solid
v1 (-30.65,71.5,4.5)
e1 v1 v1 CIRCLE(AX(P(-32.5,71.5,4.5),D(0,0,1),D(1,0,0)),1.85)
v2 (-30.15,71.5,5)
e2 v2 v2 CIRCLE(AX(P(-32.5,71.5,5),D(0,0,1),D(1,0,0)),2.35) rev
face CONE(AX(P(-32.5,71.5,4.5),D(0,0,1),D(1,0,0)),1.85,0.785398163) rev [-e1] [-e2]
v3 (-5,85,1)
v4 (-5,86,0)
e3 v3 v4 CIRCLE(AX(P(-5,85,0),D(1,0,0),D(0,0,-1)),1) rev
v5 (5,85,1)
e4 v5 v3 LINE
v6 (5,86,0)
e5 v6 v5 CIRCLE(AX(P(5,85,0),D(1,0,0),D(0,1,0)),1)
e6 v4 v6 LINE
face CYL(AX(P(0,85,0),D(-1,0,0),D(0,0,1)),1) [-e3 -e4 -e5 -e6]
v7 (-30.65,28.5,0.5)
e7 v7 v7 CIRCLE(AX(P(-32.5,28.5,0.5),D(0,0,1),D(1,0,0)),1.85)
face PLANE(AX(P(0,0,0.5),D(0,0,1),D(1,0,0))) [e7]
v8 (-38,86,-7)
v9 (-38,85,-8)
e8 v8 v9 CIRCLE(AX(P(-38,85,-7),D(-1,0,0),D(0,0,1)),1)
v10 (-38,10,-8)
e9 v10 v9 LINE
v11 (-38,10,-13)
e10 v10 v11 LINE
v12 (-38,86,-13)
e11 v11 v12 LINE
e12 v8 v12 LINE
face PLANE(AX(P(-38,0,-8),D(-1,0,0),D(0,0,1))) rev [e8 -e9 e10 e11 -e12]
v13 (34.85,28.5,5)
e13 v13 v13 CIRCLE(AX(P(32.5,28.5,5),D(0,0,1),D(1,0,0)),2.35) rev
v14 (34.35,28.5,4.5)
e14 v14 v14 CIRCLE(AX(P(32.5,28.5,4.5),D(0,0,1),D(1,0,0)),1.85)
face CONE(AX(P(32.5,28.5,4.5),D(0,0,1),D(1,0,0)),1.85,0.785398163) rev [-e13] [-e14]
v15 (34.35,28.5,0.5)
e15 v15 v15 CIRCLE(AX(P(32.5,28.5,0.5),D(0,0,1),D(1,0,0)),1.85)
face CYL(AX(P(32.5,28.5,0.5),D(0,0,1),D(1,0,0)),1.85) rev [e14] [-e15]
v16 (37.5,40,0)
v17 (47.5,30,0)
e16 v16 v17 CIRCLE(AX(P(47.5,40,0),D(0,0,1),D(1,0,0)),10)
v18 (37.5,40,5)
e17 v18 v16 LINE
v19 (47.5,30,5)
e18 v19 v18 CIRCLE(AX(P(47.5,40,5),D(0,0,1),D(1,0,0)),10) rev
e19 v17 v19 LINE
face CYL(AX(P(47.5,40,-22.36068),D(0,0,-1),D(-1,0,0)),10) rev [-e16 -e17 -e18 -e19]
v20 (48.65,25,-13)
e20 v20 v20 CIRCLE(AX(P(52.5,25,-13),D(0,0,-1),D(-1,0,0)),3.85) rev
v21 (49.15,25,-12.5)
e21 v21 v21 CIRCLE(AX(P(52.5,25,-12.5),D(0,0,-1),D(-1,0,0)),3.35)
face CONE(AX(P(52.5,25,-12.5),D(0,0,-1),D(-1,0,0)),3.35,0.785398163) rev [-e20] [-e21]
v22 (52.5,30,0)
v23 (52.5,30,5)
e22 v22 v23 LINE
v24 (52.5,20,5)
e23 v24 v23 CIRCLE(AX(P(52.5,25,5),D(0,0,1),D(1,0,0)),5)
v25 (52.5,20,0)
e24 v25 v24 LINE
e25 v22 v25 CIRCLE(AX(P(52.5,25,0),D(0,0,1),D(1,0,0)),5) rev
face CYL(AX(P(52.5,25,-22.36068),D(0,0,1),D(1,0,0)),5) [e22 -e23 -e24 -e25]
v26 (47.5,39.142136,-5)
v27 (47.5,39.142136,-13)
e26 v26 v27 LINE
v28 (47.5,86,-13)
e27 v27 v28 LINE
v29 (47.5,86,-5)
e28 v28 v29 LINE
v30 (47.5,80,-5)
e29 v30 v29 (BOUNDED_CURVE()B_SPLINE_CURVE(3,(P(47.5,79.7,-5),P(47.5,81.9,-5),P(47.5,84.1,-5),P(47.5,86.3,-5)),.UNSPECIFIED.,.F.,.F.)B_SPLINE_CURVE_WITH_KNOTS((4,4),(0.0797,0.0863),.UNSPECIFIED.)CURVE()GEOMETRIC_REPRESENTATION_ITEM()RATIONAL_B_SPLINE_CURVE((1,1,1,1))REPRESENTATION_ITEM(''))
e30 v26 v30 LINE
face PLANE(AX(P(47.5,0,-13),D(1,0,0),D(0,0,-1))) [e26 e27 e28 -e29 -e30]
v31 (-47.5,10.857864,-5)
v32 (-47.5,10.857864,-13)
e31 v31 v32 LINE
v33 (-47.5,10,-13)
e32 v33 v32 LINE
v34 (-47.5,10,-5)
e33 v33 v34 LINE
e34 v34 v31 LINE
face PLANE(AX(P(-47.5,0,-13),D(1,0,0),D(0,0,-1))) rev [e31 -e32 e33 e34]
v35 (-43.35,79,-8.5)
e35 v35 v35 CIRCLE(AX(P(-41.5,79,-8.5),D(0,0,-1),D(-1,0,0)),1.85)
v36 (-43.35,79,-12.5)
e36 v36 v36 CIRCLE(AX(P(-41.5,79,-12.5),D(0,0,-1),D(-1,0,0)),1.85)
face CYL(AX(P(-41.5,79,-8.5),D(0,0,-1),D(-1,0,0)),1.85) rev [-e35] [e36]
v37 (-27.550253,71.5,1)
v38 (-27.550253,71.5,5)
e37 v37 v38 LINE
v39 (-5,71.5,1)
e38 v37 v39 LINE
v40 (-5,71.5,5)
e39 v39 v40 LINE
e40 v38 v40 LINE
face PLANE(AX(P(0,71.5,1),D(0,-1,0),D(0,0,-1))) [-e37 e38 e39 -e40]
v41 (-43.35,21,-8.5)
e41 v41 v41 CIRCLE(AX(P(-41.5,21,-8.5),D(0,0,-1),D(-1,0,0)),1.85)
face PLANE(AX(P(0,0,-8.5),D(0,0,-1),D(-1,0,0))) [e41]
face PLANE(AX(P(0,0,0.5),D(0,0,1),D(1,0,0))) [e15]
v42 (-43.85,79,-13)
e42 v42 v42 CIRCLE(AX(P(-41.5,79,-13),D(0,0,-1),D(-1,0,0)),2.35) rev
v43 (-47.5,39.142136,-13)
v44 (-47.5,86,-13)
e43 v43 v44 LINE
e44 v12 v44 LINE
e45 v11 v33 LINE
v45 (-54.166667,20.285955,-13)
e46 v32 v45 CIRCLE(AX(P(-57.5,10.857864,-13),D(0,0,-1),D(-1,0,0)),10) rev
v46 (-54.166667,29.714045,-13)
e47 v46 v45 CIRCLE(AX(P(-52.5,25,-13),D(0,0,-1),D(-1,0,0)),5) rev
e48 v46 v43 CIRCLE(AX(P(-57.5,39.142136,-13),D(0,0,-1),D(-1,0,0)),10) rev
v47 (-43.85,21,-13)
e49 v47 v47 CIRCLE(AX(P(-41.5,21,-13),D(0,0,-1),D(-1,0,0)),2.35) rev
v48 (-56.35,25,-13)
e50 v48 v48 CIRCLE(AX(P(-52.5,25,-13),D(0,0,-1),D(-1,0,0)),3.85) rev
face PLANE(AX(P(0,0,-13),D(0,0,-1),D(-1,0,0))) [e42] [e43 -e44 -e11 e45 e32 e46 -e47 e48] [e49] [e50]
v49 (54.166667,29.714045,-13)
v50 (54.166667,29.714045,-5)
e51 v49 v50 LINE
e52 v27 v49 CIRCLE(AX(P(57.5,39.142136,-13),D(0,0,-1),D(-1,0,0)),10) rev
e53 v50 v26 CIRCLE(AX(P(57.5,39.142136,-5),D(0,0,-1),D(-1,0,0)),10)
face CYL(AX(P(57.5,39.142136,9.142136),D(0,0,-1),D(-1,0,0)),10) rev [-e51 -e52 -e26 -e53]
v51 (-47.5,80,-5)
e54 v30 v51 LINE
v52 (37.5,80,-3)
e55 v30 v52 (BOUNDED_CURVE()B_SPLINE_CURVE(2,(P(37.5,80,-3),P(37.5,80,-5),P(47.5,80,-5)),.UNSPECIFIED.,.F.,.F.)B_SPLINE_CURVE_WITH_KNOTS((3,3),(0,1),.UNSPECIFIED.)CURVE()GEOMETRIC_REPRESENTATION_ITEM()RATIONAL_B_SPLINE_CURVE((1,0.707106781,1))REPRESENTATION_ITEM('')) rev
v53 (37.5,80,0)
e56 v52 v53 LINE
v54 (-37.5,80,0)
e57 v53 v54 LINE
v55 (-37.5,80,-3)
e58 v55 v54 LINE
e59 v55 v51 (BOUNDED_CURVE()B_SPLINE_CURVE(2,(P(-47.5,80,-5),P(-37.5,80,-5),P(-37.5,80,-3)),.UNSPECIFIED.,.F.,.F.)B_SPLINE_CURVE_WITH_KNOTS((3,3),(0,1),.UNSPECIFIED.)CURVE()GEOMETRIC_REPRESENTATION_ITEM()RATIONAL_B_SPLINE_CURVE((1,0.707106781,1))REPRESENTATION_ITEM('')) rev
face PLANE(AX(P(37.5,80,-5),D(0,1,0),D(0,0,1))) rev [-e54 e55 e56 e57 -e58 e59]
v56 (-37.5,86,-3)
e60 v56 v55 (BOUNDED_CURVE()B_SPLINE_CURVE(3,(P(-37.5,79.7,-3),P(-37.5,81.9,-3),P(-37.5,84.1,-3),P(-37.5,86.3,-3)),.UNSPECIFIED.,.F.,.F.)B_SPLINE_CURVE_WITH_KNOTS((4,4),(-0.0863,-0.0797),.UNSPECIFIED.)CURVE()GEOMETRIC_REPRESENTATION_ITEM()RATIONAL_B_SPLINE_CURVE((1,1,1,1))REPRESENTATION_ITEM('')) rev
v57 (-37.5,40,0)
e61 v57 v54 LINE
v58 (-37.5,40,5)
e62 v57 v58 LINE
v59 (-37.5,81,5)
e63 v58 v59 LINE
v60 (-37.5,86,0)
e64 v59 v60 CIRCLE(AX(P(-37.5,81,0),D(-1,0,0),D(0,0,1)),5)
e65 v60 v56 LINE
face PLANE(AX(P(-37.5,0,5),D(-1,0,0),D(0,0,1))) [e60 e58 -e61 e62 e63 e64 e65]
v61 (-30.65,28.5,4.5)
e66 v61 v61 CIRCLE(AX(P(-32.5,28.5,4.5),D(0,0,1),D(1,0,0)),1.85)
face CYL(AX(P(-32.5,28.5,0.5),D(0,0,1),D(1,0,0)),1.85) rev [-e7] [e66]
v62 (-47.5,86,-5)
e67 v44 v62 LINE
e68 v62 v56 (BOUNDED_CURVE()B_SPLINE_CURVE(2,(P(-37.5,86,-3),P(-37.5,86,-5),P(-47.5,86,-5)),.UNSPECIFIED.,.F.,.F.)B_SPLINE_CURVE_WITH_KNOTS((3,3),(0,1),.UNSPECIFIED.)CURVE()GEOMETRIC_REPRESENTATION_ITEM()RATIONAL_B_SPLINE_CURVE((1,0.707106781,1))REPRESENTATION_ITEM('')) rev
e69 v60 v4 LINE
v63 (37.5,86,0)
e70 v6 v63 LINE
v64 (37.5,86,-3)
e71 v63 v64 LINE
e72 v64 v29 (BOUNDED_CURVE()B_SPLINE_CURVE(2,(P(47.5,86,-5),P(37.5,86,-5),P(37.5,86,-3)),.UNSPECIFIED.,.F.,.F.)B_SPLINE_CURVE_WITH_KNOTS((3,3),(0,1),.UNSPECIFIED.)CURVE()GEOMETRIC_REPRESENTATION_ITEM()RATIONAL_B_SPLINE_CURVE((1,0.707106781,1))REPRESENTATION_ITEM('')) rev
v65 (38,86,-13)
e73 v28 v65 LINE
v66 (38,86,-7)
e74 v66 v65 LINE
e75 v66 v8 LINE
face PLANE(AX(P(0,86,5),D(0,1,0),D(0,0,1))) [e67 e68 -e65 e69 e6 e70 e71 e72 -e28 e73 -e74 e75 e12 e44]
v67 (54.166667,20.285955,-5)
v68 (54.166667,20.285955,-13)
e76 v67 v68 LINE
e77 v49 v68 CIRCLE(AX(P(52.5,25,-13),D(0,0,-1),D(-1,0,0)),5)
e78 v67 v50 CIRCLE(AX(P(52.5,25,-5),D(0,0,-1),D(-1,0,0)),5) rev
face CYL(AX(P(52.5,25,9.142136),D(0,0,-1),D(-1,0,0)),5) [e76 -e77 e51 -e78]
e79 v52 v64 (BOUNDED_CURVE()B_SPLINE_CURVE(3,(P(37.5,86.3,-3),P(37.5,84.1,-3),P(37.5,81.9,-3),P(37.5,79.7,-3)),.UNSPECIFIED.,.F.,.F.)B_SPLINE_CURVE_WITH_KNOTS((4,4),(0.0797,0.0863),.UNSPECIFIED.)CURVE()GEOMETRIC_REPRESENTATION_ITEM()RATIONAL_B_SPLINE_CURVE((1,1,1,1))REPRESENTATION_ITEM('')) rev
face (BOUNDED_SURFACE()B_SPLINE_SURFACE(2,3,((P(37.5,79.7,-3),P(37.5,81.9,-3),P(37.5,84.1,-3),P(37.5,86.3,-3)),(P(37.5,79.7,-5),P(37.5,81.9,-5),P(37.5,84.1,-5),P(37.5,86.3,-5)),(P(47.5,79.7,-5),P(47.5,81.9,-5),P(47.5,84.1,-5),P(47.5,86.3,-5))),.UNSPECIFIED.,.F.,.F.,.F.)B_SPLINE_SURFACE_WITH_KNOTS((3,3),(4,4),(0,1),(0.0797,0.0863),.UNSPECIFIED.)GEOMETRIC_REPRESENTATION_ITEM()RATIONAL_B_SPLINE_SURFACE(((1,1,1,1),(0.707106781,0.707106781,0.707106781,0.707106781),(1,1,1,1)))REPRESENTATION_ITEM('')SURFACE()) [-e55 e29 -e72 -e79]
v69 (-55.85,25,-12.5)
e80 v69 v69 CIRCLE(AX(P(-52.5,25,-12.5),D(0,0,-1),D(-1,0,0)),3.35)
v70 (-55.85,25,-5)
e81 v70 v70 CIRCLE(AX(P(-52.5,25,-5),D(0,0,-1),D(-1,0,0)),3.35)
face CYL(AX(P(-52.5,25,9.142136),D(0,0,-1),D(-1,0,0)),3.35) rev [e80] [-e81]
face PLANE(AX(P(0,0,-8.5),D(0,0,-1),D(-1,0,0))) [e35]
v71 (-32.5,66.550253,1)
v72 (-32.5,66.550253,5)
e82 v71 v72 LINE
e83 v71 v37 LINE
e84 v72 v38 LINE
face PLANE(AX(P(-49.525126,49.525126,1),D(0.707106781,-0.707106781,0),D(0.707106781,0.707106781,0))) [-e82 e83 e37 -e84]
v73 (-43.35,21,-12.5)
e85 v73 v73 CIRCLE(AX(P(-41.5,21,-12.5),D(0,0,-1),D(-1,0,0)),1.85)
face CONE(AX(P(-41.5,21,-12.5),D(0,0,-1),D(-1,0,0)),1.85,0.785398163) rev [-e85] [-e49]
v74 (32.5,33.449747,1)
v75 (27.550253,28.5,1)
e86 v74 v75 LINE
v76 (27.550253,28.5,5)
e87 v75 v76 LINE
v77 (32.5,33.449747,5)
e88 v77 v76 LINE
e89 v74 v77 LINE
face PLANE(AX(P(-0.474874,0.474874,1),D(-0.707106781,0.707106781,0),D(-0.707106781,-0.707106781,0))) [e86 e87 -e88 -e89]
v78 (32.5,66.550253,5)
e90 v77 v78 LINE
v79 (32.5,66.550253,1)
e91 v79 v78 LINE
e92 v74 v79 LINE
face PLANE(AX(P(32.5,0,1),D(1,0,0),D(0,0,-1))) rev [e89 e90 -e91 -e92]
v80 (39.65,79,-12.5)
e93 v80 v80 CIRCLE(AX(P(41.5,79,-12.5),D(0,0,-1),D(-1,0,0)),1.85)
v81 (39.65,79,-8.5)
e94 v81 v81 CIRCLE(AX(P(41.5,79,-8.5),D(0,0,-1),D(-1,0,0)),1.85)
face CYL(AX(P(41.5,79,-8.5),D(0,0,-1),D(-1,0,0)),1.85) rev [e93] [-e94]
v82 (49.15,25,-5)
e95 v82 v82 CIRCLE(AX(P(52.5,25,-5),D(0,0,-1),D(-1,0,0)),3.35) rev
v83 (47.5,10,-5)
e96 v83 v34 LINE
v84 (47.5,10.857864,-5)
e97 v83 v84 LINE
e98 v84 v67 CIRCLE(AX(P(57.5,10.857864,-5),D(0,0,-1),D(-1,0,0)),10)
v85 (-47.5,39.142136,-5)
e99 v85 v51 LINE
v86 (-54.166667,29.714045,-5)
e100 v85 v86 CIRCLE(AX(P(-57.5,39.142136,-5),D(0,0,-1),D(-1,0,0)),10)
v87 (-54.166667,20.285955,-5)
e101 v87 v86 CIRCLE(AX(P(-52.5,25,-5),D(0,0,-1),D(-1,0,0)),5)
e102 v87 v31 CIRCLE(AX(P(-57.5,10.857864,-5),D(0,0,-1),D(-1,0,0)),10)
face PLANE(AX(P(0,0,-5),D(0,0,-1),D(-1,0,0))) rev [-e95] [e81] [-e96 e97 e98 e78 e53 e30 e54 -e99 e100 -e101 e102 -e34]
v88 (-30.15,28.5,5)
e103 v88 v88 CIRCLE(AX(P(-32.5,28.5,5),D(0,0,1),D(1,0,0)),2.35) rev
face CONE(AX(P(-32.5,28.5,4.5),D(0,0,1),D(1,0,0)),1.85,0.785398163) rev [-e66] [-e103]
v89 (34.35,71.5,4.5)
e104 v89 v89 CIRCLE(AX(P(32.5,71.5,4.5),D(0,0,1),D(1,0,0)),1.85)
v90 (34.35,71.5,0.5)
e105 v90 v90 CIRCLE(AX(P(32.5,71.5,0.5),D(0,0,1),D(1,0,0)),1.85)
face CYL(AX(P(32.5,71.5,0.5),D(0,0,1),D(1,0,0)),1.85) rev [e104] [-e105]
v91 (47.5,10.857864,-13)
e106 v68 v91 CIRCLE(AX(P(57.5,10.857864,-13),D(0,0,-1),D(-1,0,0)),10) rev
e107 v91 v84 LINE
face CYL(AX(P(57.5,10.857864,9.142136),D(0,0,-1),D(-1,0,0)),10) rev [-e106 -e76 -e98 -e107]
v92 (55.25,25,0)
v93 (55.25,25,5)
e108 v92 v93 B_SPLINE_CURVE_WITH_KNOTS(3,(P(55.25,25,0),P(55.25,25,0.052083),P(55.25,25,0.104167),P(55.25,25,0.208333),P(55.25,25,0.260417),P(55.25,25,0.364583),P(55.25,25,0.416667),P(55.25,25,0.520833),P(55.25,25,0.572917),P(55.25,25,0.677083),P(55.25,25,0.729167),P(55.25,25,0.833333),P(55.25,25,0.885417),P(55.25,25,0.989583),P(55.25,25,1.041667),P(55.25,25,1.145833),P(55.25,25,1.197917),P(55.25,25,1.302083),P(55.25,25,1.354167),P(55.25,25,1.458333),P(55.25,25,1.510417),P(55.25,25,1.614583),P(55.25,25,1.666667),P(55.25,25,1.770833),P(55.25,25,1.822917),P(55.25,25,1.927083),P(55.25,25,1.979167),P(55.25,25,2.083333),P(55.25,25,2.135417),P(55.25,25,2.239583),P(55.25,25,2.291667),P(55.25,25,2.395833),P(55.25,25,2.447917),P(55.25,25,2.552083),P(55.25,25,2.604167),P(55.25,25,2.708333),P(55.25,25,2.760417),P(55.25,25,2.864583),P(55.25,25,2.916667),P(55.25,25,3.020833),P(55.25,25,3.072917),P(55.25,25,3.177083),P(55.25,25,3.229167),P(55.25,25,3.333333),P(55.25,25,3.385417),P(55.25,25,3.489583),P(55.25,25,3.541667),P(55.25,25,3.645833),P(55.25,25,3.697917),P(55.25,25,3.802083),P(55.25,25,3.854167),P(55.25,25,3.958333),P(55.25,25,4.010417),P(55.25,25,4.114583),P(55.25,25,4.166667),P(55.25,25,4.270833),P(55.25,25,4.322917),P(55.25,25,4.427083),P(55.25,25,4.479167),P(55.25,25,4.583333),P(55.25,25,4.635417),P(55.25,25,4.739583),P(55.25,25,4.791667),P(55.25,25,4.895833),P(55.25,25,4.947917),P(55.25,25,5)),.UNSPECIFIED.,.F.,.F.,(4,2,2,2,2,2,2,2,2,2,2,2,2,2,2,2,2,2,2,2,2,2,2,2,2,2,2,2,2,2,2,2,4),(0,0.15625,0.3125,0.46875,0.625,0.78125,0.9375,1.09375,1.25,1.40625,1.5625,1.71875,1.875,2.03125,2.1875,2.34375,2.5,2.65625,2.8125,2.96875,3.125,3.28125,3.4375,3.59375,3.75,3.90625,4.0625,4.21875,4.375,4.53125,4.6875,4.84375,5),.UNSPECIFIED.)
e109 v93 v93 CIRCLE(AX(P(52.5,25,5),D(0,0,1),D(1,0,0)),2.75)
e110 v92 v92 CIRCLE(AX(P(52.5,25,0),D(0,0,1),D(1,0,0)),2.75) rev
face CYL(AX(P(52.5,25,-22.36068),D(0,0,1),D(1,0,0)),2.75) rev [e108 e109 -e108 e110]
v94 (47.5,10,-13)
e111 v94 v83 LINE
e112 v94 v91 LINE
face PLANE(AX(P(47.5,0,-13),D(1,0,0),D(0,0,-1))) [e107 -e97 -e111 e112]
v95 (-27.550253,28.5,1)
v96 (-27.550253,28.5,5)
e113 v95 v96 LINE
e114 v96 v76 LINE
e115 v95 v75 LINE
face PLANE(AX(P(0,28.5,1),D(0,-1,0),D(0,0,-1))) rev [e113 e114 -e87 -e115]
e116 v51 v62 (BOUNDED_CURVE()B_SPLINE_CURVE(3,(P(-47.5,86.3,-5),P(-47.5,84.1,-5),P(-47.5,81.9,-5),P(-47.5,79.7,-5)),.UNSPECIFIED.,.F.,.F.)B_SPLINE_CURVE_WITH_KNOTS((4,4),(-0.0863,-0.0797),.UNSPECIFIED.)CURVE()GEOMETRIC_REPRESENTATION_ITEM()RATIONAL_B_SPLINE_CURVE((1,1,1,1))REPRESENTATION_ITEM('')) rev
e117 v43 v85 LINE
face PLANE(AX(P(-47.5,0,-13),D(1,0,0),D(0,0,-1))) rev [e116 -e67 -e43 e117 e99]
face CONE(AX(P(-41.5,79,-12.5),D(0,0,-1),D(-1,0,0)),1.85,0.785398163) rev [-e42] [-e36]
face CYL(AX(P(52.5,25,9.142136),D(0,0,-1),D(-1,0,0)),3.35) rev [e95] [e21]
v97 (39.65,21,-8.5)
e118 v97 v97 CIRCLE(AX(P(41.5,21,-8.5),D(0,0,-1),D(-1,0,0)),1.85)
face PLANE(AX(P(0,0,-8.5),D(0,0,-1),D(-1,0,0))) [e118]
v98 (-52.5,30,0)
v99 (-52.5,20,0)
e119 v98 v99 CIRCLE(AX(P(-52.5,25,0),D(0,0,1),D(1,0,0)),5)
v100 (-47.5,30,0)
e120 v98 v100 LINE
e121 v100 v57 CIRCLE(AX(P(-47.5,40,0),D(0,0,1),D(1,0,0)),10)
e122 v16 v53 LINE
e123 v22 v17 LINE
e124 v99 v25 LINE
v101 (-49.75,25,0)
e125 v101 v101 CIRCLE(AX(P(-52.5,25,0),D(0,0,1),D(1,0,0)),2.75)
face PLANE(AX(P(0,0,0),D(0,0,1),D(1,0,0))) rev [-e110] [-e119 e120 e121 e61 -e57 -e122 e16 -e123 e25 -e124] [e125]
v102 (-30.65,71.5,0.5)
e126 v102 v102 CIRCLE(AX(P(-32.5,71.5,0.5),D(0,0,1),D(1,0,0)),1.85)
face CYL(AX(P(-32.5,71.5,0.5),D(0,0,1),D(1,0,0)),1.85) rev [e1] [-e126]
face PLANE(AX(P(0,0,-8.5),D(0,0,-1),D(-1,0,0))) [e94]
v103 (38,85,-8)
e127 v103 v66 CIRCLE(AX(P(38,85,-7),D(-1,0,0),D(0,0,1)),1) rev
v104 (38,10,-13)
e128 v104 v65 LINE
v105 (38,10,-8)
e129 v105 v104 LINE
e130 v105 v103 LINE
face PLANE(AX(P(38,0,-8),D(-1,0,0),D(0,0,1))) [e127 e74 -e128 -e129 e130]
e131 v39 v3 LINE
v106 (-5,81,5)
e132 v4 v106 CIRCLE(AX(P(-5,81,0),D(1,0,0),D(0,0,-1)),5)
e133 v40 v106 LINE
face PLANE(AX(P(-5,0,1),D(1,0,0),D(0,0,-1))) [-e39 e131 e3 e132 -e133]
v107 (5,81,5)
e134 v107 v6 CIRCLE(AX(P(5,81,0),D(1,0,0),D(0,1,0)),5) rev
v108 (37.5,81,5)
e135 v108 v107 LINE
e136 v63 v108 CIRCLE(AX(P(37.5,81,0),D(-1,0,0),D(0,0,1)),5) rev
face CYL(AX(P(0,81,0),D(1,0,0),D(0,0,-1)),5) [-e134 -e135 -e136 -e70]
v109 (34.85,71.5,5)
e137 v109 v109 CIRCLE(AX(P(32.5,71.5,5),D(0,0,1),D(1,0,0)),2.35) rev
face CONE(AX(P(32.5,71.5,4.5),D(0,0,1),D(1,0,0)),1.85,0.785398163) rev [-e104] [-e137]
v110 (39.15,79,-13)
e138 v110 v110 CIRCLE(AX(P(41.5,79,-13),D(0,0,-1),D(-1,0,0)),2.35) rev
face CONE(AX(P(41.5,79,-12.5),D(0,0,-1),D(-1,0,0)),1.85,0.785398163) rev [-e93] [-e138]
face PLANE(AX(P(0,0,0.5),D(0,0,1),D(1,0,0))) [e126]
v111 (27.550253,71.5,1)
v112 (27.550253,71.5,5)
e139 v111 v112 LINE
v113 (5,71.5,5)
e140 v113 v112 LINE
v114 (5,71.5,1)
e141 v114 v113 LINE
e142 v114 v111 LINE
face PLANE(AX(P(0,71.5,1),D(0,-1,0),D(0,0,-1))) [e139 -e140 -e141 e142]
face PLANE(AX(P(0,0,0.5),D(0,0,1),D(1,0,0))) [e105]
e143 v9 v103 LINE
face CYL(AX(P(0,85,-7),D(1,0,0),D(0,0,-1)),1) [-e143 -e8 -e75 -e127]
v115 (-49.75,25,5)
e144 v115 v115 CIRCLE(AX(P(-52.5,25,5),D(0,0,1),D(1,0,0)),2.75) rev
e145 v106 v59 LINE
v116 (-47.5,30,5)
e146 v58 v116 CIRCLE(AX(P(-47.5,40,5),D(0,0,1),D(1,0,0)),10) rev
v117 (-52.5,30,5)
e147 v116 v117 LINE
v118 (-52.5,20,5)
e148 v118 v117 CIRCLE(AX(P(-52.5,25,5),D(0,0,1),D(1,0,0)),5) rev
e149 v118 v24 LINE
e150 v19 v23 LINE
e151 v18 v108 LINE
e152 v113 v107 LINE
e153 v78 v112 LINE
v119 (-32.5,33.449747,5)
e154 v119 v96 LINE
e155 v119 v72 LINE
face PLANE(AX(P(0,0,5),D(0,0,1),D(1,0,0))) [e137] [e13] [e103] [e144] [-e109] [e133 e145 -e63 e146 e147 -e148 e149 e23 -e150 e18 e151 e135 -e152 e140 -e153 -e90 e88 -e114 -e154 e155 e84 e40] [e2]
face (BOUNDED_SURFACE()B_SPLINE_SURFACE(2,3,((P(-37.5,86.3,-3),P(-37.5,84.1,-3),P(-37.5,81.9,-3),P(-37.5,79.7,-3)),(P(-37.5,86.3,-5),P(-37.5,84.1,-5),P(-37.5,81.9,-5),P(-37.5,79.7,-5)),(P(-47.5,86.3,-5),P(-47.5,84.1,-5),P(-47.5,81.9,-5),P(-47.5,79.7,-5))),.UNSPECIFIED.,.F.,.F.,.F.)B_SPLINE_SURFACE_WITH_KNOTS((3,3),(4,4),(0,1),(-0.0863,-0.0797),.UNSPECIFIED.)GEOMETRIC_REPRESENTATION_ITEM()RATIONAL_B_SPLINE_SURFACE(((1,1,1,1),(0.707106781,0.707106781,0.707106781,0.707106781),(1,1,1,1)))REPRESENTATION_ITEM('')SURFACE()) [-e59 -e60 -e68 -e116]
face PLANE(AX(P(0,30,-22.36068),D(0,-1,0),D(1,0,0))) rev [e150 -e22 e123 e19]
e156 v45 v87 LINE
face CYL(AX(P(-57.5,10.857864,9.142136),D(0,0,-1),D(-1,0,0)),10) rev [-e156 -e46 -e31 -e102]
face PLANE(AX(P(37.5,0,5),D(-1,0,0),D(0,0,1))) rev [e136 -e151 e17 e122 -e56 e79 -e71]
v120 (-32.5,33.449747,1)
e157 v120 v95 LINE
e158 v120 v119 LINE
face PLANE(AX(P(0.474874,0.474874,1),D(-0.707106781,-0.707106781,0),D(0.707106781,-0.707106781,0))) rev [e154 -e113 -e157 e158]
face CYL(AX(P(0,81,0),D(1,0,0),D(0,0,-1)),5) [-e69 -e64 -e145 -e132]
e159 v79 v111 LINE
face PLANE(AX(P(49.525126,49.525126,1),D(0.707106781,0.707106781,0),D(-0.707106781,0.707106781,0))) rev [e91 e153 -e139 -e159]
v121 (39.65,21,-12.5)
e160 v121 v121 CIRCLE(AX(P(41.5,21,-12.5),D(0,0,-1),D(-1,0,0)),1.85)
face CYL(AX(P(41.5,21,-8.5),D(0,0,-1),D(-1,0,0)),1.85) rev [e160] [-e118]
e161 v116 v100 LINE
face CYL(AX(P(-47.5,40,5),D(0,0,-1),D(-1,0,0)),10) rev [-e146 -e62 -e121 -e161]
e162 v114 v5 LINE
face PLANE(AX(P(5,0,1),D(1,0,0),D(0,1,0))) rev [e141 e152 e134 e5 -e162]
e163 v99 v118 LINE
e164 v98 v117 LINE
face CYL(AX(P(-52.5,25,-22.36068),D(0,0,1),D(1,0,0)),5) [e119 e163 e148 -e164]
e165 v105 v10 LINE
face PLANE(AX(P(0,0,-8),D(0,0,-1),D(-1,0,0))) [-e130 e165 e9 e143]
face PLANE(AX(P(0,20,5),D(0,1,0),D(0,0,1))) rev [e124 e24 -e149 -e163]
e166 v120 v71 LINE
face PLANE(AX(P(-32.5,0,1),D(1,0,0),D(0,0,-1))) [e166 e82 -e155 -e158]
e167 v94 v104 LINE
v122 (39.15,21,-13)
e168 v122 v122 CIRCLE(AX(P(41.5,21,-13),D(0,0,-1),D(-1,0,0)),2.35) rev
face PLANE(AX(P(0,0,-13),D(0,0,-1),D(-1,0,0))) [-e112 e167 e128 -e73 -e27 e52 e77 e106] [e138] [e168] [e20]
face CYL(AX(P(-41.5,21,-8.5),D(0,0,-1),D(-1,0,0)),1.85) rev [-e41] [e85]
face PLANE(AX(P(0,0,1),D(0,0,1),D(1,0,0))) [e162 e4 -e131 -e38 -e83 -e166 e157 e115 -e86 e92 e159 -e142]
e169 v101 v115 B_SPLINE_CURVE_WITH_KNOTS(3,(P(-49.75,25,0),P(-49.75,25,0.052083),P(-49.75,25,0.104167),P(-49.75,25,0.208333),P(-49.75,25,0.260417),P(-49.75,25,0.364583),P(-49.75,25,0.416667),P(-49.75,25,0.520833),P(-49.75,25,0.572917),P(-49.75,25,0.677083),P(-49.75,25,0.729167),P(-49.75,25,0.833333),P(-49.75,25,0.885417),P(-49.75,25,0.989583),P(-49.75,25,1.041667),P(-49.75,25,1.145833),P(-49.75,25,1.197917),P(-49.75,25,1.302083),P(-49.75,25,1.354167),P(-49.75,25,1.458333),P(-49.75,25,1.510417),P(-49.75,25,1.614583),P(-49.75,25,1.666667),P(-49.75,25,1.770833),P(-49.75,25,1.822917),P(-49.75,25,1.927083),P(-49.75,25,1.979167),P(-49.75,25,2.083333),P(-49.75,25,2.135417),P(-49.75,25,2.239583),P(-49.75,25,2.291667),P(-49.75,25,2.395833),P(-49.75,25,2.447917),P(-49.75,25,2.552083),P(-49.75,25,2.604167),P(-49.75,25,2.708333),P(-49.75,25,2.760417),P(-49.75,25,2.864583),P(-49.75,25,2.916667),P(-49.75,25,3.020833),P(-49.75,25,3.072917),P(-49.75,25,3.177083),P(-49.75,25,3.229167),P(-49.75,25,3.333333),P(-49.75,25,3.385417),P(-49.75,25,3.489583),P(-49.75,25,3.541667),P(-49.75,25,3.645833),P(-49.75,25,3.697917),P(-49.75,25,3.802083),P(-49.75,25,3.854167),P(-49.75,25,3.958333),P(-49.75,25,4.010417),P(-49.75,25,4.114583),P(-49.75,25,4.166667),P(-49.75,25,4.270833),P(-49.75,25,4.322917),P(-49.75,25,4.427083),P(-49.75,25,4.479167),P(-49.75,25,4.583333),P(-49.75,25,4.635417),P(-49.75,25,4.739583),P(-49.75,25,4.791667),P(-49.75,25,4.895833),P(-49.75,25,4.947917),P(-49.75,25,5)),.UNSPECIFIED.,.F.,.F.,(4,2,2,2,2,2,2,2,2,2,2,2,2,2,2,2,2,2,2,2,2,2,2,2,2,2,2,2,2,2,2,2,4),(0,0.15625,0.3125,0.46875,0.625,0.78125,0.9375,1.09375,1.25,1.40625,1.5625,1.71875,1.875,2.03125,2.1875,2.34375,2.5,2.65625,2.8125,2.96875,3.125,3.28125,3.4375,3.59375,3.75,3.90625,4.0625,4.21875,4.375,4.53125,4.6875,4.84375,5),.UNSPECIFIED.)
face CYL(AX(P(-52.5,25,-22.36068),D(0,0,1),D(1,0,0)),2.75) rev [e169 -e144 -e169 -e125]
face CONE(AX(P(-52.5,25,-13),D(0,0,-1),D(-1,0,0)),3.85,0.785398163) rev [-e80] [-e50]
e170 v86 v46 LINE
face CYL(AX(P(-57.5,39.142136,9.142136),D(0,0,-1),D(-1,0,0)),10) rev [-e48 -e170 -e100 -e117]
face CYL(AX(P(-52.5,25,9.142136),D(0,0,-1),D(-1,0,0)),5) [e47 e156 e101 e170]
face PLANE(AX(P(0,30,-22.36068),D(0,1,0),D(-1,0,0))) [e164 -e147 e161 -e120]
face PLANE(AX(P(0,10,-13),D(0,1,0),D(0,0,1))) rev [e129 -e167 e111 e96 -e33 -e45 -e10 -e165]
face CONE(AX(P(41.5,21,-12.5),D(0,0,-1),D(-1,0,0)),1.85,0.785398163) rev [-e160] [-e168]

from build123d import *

# Parameters (mm, degrees)
SKETCH1_W           = 75
SKETCH1_H           = 6
SKETCH1_H_2         = 60
BOSS_EXTRUDE1_DEPTH = 5
SKETCH2_W           = 10
SKETCH2_H           = 14.5
CUT_EXTRUDE1_DEPTH  = 4
CUT_EXTRUDE2_DEPTH  = 4.5
SKETCH3_W           = 75
SKETCH3_H           = 6
BOSS_EXTRUDE2_DEPTH = 5
SKETCH4_W           = 95
SKETCH4_H           = 76
BOSS_EXTRUDE3_DEPTH = 8
SKETCH5_W           = 76
SKETCH5_H           = 76
CUT_EXTRUDE3_DEPTH  = 5
SKETCH5_3_R         = 1.85
CUT_EXTRUDE4_DEPTH  = 4.5
FILLET1_R           = 1
FILLET2_R           = 5
FILLET3_SIZE        = 10
FILLET3_SIZE_2      = 2
BOSS_EXTRUDE4_DEPTH = 5
BOSS_EXTRUDE5_START = -8
SKETCH8_R           = 5
SKETCH8_R_2         = 3.35
BOSS_EXTRUDE5_DEPTH = 8
FILLET4_R           = 10
CHAMFER1_SIZE       = 0.5


with BuildPart() as part:
    # Sketch1 → Boss-Extrude1 (new body)
    with BuildSketch(Plane.XY):
        with Locations((0, 83)):
            Rectangle(SKETCH1_W, SKETCH1_H)
        with Locations((0, 50)):
            Rectangle(SKETCH1_W, SKETCH1_H_2)
    extrude(amount=BOSS_EXTRUDE1_DEPTH)

    # Sketch2 → Cut-Extrude1 (cut)
    with BuildSketch(Plane.XY.offset(5)):
        Polygon((-27.550252532, 71.5), (-32.5, 66.550252532), (-32.5, 33.449747468), (-27.550252532, 28.5), (27.550252532, 28.5), (32.5, 33.449747468), (32.5, 66.550252532), (27.550252532, 71.5), (5, 71.5), (-5, 71.5), align=None)
        with Locations((0, 78.75)):
            Rectangle(SKETCH2_W, SKETCH2_H)
    extrude(amount=-CUT_EXTRUDE1_DEPTH, mode=Mode.SUBTRACT)

    # Sketch2<3> → Cut-Extrude2 (cut)
    with BuildSketch(Plane.XY.offset(5)):
        with BuildLine():
            ThreePointArc((-30.65, 71.5), (-33.808147545, 72.808147545), (-32.5, 69.65))
            Line((-32.5, 69.65), (-32.5, 71.5))
            Line((-32.5, 71.5), (-30.65, 71.5))
        make_face()
        with BuildLine():
            Line((-32.5, 71.5), (-32.5, 69.65))
            ThreePointArc((-32.5, 69.65), (-31.191852455, 70.191852455), (-30.65, 71.5))
            Line((-30.65, 71.5), (-32.5, 71.5))
        make_face()
        with BuildLine():
            ThreePointArc((34.35, 71.5), (32.5, 73.35), (30.65, 71.5))
            Line((30.65, 71.5), (32.5, 71.5))
            Line((32.5, 71.5), (32.5, 69.65))
            ThreePointArc((32.5, 69.65), (33.808147545, 70.191852455), (34.35, 71.5))
        make_face()
        with BuildLine():
            Line((32.5, 71.5), (30.65, 71.5))
            ThreePointArc((30.65, 71.5), (31.191852455, 70.191852455), (32.5, 69.65))
            Line((32.5, 69.65), (32.5, 71.5))
        make_face()
        with BuildLine():
            ThreePointArc((32.5, 30.35), (31.191852455, 29.808147545), (30.65, 28.5))
            Line((30.65, 28.5), (32.5, 28.5))
            Line((32.5, 28.5), (32.5, 30.35))
        make_face()
        with BuildLine():
            Line((32.5, 28.5), (30.65, 28.5))
            ThreePointArc((30.65, 28.5), (32.5, 26.65), (34.35, 28.5))
            ThreePointArc((34.35, 28.5), (33.808147545, 29.808147545), (32.5, 30.35))
            Line((32.5, 30.35), (32.5, 28.5))
        make_face()
        with BuildLine():
            ThreePointArc((-30.65, 28.5), (-31.191852455, 29.808147545), (-32.5, 30.35))
            Line((-32.5, 30.35), (-32.5, 28.5))
            Line((-32.5, 28.5), (-30.65, 28.5))
        make_face()
        with BuildLine():
            Line((-32.5, 28.5), (-32.5, 30.35))
            ThreePointArc((-32.5, 30.35), (-33.808147545, 27.191852455), (-30.65, 28.5))
            Line((-30.65, 28.5), (-32.5, 28.5))
        make_face()
    extrude(amount=-CUT_EXTRUDE2_DEPTH, mode=Mode.SUBTRACT)

    # Sketch3 → Boss-Extrude2 (add)
    with BuildSketch(Plane(origin=(0, 0, 0), x_dir=(-1, 0, 0), z_dir=(0, 0, -1))):
        with Locations((0, 83)):
            Rectangle(SKETCH3_W, SKETCH3_H)
    extrude(amount=BOSS_EXTRUDE2_DEPTH)

    # Sketch4 → Boss-Extrude3 (add)
    with BuildSketch(Plane(origin=(0, 0, -5), x_dir=(-1, 0, 0), z_dir=(0, 0, -1))):
        with Locations((0, 48)):
            Rectangle(SKETCH4_W, SKETCH4_H)
    extrude(amount=BOSS_EXTRUDE3_DEPTH)

    # Sketch5 → Cut-Extrude3 (cut)
    with BuildSketch(Plane(origin=(0, 0, -13), x_dir=(-1, 0, 0), z_dir=(0, 0, -1))):
        with Locations((0, 48)):
            Rectangle(SKETCH5_W, SKETCH5_H)
    extrude(amount=-CUT_EXTRUDE3_DEPTH, mode=Mode.SUBTRACT)

    # Sketch5<3> → Cut-Extrude4 (cut)
    with BuildSketch(Plane(origin=(0, 0, -13), x_dir=(-1, 0, 0), z_dir=(0, 0, -1))):
        with Locations((-41.5, 79)):
            Circle(SKETCH5_3_R)
        with Locations((-41.5, 21)):
            Circle(SKETCH5_3_R)
        with Locations((41.5, 21)):
            Circle(SKETCH5_3_R)
        with Locations((41.5, 79)):
            Circle(SKETCH5_3_R)
    extrude(amount=-CUT_EXTRUDE4_DEPTH, mode=Mode.SUBTRACT)

    # Fillet1
    fillet1_edges = [part.edges().sort_by_distance(p)[0] for p in [
        (0, 86, -8),
        (0, 86, 1),
    ]]
    fillet(fillet1_edges, radius=FILLET1_R)

    # Fillet2
    fillet2_edges = [part.edges().sort_by_distance(p)[0] for p in [
        (21.25, 86, 5),
        (-21.25, 86, 5),
    ]]
    fillet(fillet2_edges, radius=FILLET2_R)

    # Fillet3
    # an asymmetric fillet: 10, 2 mm, written as the material it adds along each edge
    with BuildSketch(Plane(origin=(37.5, 80, -5), x_dir=(1, 0, 0), z_dir=(0, 1, 0))) as fillet3_piece_1:
        with BuildLine():
            Bezier((FILLET3_SIZE, 0), (0, 0), (0, -FILLET3_SIZE_2), weights=[1, 0.707106781, 1])
            Line((0, -FILLET3_SIZE_2), (0, 0))
            Line((0, 0), (FILLET3_SIZE, 0))
        make_face()
    extrude(amount=6)
    with BuildSketch(Plane(origin=(-37.5, 86, -5), x_dir=(0, 0, 1), z_dir=(0, -1, 0))) as fillet3_piece_2:
        with BuildLine():
            Bezier((FILLET3_SIZE_2, 0), (0, 0), (0, FILLET3_SIZE), weights=[1, 0.707106781, 1])
            Line((0, FILLET3_SIZE), (0, 0))
            Line((0, 0), (FILLET3_SIZE_2, 0))
        make_face()
    extrude(amount=6)

    # Sketch7 → Boss-Extrude4 (add)
    with BuildSketch(Plane.XY.offset(5)):
        with BuildLine():
            Line((37.5, 30), (37.5, 20))
            Line((37.5, 20), (52.5, 20))
            ThreePointArc((52.5, 20), (47.5, 25), (52.5, 30))
            Line((52.5, 30), (37.5, 30))
        make_face()
        with BuildLine():
            ThreePointArc((52.5, 30), (47.5, 25), (52.5, 20))
            Line((52.5, 20), (52.5, 22.25))
            ThreePointArc((52.5, 22.25), (49.75, 25), (52.5, 27.75))
            Line((52.5, 27.75), (52.5, 30))
        make_face()
        with BuildLine():
            Line((52.5, 22.25), (52.5, 20))
            ThreePointArc((52.5, 20), (56.035533906, 21.464466094), (57.5, 25))
            ThreePointArc((57.5, 25), (56.035533906, 28.535533906), (52.5, 30))
            Line((52.5, 30), (52.5, 27.75))
            ThreePointArc((52.5, 27.75), (54.444543648, 26.944543648), (55.25, 25))
            ThreePointArc((55.25, 25), (54.444543648, 23.055456352), (52.5, 22.25))
        make_face()
        with BuildLine():
            Line((-37.5, 20), (-37.5, 30))
            Line((-37.5, 30), (-52.5, 30))
            ThreePointArc((-52.5, 30), (-48.964466094, 28.535533906), (-47.5, 25))
            ThreePointArc((-47.5, 25), (-48.964466094, 21.464466094), (-52.5, 20))
            Line((-52.5, 20), (-37.5, 20))
        make_face()
        with BuildLine():
            ThreePointArc((-47.5, 25), (-48.964466094, 28.535533906), (-52.5, 30))
            Line((-52.5, 30), (-52.5, 27.75))
            ThreePointArc((-52.5, 27.75), (-50.555456352, 26.944543648), (-49.75, 25))
            ThreePointArc((-49.75, 25), (-50.555456352, 23.055456352), (-52.5, 22.25))
            Line((-52.5, 22.25), (-52.5, 20))
            ThreePointArc((-52.5, 20), (-48.964466094, 21.464466094), (-47.5, 25))
        make_face()
        with BuildLine():
            Line((-52.5, 27.75), (-52.5, 30))
            ThreePointArc((-52.5, 30), (-57.5, 25), (-52.5, 20))
            Line((-52.5, 20), (-52.5, 22.25))
            ThreePointArc((-52.5, 22.25), (-55.25, 25), (-52.5, 27.75))
        make_face()
    extrude(amount=-BOSS_EXTRUDE4_DEPTH)

    # Sketch8 → Boss-Extrude5 (add)
    # profile 1 of 6: a face of its own
    with BuildSketch(Plane(origin=(0, 0, -13), x_dir=(-1, 0, 0), z_dir=(0, 0, -1)).offset(BOSS_EXTRUDE5_START)):
        with BuildLine():
            Line((-47.5, 20), (-47.5, 25))
            ThreePointArc((-47.5, 25), (-48.964466094, 21.464466094), (-52.5, 20))
            Line((-52.5, 20), (-47.5, 20))
        make_face()
    # profile 2 of 6: a face of its own
    with BuildSketch(Plane(origin=(0, 0, -13), x_dir=(-1, 0, 0), z_dir=(0, 0, -1)).offset(BOSS_EXTRUDE5_START)):
        with BuildLine():
            Line((-47.5, 30), (-52.5, 30))
            ThreePointArc((-52.5, 30), (-48.964466094, 28.535533906), (-47.5, 25))
            Line((-47.5, 25), (-47.5, 30))
        make_face()
    # profile 3 of 6: a face of its own
    with BuildSketch(Plane(origin=(0, 0, -13), x_dir=(-1, 0, 0), z_dir=(0, 0, -1)).offset(BOSS_EXTRUDE5_START)):
        with Locations((-52.5, 25)):
            Circle(SKETCH8_R)
        with Locations((-52.5, 25)):
            Circle(SKETCH8_R_2, mode=Mode.SUBTRACT)
    # profile 4 of 6: a face of its own
    with BuildSketch(Plane(origin=(0, 0, -13), x_dir=(-1, 0, 0), z_dir=(0, 0, -1)).offset(BOSS_EXTRUDE5_START)):
        with BuildLine():
            Line((47.5, 30), (47.5, 25))
            ThreePointArc((47.5, 25), (48.964466094, 28.535533906), (52.5, 30))
            Line((52.5, 30), (47.5, 30))
        make_face()
    # profile 5 of 6: a face of its own
    with BuildSketch(Plane(origin=(0, 0, -13), x_dir=(-1, 0, 0), z_dir=(0, 0, -1)).offset(BOSS_EXTRUDE5_START)):
        with BuildLine():
            Line((47.5, 25), (47.5, 20))
            Line((47.5, 20), (52.5, 20))
            ThreePointArc((52.5, 20), (48.964466094, 21.464466094), (47.5, 25))
        make_face()
    # profile 6 of 6: a face of its own
    with BuildSketch(Plane(origin=(0, 0, -13), x_dir=(-1, 0, 0), z_dir=(0, 0, -1)).offset(BOSS_EXTRUDE5_START)):
        with Locations((52.5, 25)):
            Circle(SKETCH8_R)
        with Locations((52.5, 25)):
            Circle(SKETCH8_R_2, mode=Mode.SUBTRACT)
    extrude(amount=BOSS_EXTRUDE5_DEPTH)

    # Fillet4
    # the kernel refuses this fillet: 10 mm, written as the material it adds along each edge
    with BuildSketch(Plane(origin=(37.5, 30, 5), x_dir=(0, 1, 0), z_dir=(0, 0, -1))) as fillet4_piece_1:
        with BuildLine():
            CenterArc((FILLET4_R, FILLET4_R), FILLET4_R, 180, 90)
            Line((0, FILLET4_R), (0, 0))
            Line((0, 0), (FILLET4_R, 0))
        make_face()
    extrude(amount=5)
    with BuildSketch(Plane(origin=(47.5, 20, -5), x_dir=(0, -1, 0), z_dir=(0, 0, -1)), Plane(origin=(-47.5, 30, -5), x_dir=(0, 1, 0), z_dir=(0, 0, -1))) as fillet4_piece_2:
        with BuildLine():
            CenterArc((9.142135624, -10), FILLET4_R, 90, 70.528779366)
            Line((-0.285954792, -6.666666667), (-1.228763834, -6.333333333))
            ThreePointArc((-1.228763834, -6.333333333), (-1, -5), (-1, 0))
            Line((-1, 0), (0, 1))
            Line((0, 1), (9.142135624, 1))
            Line((9.142135624, 1), (9.142135624, 0))
        make_face()
    extrude(amount=8)
    with BuildSketch(Plane(origin=(47.5, 30, -5), x_dir=(0, 1, 0), z_dir=(0, 0, -1)), Plane(origin=(-47.5, 20, -5), x_dir=(0, -1, 0), z_dir=(0, 0, -1))) as fillet4_piece_3:
        with BuildLine():
            CenterArc((9.142135624, 10), FILLET4_R, 199.471220634, 70.528779366)
            Line((-0.285954792, 6.666666667), (-1.228763834, 6.333333333))
            ThreePointArc((-1.228763834, 6.333333333), (-1, 5), (-1, 0))
            Line((-1, 0), (0, -1))
            Line((0, -1), (9.142135624, -1))
            Line((9.142135624, -1), (9.142135624, 0))
        make_face()
    extrude(amount=8)
    with BuildSketch(Plane(origin=(-37.5, 30, 5), x_dir=(0, 1, 0), z_dir=(0, 0, -1))) as fillet4_piece_4:
        with BuildLine():
            CenterArc((FILLET4_R, -FILLET4_R), FILLET4_R, 90, 90)
            Line((0, -FILLET4_R), (0, 0))
            Line((0, 0), (FILLET4_R, 0))
        make_face()
    extrude(amount=5)

    # Chamfer1
    chamfer1_edges = [part.edges().sort_by_distance(p)[0] for p in [
        (-39.65, 79, -13),
        (-39.65, 21, -13),
        (43.35, 21, -13),
        (43.35, 79, -13),
        (55.85, 25, -13),
        (-49.15, 25, -13),
        (-34.35, 28.5, 5),
        (30.65, 28.5, 5),
        (34.35, 71.5, 5),
        (-32.5, 73.35, 5),
    ]]
    chamfer(chamfer1_edges, length=CHAMFER1_SIZE)


solid = part.part
